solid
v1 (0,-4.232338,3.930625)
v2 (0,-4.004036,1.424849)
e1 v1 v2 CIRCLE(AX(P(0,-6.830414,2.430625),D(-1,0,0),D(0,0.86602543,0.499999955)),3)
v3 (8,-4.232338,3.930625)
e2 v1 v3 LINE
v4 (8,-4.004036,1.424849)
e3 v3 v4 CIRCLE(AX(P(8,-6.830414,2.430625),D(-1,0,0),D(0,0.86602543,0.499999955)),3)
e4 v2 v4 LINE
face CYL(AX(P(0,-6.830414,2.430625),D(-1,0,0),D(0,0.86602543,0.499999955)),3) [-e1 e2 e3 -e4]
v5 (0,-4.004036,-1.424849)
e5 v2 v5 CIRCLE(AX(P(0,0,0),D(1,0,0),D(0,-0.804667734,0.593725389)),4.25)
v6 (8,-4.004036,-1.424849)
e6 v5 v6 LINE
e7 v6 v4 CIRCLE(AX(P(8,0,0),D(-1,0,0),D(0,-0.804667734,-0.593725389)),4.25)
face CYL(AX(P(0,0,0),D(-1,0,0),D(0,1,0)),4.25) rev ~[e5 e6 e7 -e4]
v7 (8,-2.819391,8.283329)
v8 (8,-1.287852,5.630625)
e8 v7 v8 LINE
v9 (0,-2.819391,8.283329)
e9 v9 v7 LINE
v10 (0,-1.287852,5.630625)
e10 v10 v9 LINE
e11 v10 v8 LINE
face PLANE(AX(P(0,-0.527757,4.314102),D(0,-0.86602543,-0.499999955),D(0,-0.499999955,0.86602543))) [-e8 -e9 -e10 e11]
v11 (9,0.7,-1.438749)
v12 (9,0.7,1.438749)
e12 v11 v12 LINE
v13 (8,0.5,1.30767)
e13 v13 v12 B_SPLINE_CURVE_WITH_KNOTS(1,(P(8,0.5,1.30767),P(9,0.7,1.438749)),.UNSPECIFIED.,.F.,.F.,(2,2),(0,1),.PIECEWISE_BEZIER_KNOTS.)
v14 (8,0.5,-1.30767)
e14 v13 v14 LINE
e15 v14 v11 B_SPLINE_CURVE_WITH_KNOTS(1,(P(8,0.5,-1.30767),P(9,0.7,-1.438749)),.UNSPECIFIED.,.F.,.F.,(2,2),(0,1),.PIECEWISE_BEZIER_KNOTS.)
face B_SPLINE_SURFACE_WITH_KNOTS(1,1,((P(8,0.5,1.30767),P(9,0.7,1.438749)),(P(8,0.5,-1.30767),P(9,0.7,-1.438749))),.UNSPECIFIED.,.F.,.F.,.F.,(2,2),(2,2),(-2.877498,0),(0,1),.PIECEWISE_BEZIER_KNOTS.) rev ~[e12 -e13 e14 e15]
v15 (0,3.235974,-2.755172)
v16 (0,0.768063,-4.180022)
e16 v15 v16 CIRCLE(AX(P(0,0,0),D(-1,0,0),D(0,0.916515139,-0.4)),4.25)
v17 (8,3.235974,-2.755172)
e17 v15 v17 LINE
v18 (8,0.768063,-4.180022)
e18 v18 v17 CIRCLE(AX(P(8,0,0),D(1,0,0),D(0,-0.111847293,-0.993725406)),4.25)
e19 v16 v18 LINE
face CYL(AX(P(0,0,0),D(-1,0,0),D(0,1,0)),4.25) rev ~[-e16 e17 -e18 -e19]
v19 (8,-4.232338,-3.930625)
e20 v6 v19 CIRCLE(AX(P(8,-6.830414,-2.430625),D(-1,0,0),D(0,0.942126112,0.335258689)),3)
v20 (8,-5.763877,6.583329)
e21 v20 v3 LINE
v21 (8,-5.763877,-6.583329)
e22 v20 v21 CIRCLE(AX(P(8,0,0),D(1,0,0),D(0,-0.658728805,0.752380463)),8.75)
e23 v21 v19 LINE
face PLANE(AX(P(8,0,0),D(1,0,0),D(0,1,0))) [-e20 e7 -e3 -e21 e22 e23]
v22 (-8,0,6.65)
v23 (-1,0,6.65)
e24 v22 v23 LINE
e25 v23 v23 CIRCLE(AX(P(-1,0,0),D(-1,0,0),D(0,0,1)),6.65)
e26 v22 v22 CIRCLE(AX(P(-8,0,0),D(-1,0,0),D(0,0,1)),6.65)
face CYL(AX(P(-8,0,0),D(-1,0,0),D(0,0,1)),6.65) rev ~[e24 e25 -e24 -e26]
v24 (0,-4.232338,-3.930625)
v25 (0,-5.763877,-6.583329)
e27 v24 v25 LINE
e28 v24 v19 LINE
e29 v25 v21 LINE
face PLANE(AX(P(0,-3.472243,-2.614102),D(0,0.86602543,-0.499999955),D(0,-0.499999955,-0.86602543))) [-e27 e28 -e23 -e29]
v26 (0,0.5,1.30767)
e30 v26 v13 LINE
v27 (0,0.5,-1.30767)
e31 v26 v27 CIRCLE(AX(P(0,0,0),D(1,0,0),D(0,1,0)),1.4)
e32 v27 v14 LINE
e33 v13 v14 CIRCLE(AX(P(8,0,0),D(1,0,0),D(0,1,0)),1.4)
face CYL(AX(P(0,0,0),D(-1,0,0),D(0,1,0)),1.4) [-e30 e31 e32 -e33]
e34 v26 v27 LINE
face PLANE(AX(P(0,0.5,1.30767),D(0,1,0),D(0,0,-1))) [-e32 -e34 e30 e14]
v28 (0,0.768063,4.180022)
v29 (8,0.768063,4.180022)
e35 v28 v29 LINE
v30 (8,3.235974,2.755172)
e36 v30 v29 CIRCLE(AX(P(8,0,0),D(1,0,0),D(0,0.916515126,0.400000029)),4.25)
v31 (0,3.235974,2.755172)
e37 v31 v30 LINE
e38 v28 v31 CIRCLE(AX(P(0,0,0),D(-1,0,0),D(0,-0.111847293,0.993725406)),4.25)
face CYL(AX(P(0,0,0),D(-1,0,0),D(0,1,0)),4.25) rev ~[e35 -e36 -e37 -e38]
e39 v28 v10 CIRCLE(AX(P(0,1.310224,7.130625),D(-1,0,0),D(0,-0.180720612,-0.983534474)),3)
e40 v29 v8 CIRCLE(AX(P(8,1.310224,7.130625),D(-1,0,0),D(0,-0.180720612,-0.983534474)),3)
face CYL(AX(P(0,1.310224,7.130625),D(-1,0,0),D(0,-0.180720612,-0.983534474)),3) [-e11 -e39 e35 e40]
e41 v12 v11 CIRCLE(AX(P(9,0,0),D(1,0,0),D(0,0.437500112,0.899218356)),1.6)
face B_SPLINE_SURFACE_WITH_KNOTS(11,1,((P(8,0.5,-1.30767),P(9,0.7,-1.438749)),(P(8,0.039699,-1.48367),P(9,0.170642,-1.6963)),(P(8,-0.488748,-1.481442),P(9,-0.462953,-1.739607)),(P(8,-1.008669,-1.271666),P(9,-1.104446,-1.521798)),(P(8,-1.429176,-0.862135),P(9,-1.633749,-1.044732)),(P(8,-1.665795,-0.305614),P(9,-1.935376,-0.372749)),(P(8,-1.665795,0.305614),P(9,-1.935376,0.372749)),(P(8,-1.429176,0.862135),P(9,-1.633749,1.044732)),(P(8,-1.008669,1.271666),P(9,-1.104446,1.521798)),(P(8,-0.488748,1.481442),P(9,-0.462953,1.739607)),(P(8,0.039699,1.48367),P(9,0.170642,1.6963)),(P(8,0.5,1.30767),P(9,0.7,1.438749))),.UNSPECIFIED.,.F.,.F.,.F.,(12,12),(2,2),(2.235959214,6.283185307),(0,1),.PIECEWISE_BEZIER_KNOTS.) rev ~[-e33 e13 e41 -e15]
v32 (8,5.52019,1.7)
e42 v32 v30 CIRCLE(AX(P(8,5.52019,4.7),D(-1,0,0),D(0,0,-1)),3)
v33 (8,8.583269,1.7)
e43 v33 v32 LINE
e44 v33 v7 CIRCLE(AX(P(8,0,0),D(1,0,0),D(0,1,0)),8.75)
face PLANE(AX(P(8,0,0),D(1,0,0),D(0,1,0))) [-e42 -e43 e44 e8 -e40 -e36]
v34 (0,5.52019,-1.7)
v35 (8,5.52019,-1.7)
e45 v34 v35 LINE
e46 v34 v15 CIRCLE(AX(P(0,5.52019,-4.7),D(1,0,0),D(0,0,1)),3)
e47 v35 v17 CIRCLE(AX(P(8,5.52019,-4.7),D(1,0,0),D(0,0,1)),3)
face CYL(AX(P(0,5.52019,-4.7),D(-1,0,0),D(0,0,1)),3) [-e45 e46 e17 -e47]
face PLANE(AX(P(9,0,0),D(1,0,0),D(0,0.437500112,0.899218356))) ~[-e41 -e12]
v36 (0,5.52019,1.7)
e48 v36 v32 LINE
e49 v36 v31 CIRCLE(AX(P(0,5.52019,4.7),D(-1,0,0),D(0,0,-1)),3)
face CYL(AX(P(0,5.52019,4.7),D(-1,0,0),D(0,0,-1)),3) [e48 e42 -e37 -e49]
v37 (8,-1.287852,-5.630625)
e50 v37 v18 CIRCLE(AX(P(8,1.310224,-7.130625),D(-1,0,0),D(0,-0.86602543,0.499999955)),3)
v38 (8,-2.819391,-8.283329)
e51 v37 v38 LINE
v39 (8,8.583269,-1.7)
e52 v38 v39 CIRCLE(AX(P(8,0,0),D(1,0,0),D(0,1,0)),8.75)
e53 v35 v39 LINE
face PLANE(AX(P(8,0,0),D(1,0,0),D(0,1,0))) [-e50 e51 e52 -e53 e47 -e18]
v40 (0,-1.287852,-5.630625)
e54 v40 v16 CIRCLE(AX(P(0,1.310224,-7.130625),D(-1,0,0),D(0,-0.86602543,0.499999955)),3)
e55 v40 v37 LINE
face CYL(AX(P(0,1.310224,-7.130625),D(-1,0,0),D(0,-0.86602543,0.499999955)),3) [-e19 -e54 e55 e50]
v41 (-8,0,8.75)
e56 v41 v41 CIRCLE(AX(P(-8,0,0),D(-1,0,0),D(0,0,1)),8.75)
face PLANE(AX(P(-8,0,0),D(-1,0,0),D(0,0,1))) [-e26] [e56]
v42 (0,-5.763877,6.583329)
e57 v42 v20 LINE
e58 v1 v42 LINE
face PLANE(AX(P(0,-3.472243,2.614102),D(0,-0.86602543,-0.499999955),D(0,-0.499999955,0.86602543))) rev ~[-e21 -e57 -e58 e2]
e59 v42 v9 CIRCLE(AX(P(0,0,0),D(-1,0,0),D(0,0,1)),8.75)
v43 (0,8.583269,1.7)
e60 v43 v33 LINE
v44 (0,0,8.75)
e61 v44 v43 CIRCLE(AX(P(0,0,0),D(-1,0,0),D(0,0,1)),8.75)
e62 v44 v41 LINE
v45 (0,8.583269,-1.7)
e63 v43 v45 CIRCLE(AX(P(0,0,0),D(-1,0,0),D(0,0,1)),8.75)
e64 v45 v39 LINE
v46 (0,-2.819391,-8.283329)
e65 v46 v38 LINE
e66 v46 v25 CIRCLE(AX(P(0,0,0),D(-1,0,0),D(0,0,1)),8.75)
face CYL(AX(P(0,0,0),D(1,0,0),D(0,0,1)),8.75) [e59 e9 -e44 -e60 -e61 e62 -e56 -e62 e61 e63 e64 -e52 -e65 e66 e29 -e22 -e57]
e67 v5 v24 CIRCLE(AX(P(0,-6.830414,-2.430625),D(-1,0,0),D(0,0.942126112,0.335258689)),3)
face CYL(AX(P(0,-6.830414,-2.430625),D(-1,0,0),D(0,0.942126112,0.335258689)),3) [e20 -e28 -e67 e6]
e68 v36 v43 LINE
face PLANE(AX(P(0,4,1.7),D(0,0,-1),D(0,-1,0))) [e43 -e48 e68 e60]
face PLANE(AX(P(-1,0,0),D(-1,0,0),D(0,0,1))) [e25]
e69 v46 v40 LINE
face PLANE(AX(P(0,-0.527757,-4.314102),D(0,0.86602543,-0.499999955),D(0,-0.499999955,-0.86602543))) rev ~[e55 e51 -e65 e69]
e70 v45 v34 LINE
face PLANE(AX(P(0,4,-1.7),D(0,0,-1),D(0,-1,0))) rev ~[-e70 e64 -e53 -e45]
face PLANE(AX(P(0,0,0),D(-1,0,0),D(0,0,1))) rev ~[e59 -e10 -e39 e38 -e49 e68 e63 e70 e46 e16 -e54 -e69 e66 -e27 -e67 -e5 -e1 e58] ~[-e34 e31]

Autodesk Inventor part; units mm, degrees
ref_plane "YZ Plane" through (0, 0, 0) normal (1, 0, 0) x (0, 1, 0)
ref_plane "XZ Plane" through (0, 0, 0) normal (0, 1, 0) x (-1, 0, 0)
sketch "Sketch1" plane through (0, 0, 0) normal (1, 0, 0) x (0, 1, 0)
  circle A0 centre (0, 0) radius 1.4
  line L0 (0.5, 1.30767) -> (0.5, -1.30767)
  dimension "d1" = 2.8
  dimension "d2" = 0.5
extrude "Extrusion1" add sketch "Sketch1" along normal blind 8 contours L0 A0 picked at (-0.62029, 0.295862)
sketch "Sketch2" plane through (0, 0, 0) normal (-1, 0, 0) x (0, 0, 1)
  circle A0 centre (0, 0) radius 8.75
  arc A1 (-1.30767, 0.5) -> (1.30767, 0.5) centre (0, 0) ccw
  dimension "d5" = 17.5
extrude "Extrusion2" add sketch "Sketch2" along normal blind 8
sketch "Sketch3" plane through (0, 0, 0) normal (1, 0, 0) x (0, 1, 0)
  circle A0 centre (0, 0) radius 4.25
  line L0 (4, 1.7) -> (8.583269, 1.7)
  line L1 (4, -1.7) -> (8.583269, -1.7)
  line L2 (-10.5, 0) -> (10.5, 0)
  circle A1 centre (0, 0) radius 8.75
  line L3 (0.5, -1.30767) -> (0.5, 1.30767)
  arc A2 (0.5, 1.30767) -> (0.5, -1.30767) centre (0, 0) ccw
  arc A3 (3.852905, 1.793773) -> (4, 1.7) centre (4, 1.862255) ccw
  arc A4 (4, -1.7) -> (3.852905, -1.793773) centre (4, -1.862255) ccw
  line L4 (-3.472243, 2.614102) -> (-5.763877, 6.583329)
  line L5 (-0.527757, 4.314102) -> (-2.819391, 8.283329)
  arc A5 (-0.527757, 4.314102) -> (-0.373, 4.2336) centre (-0.38724, 4.395229) ccw
  arc A6 (-3.479906, 2.439827) -> (-3.472243, 2.614102) centre (-3.61276, 2.532974) ccw
  line L6 (-0.527757, -4.314102) -> (-2.819391, -8.283329)
  line L7 (-3.472243, -2.614102) -> (-5.763877, -6.583329)
  arc A7 (-3.472243, -2.614102) -> (-3.479906, -2.439827) centre (-3.61276, -2.532974) ccw
  arc A8 (-0.373, -4.2336) -> (-0.527757, -4.314102) centre (-0.38724, -4.395229) ccw
  arc A9 (0.5, 1.30767) -> (0.5, -1.30767) centre (0, 0) ccw
  circle A10 centre (0, 0) radius 5
  line L8 (4, 1.7) -> (3.895189, 1.7)
  line L9 (4, -1.7) -> (3.840573, -1.7)
  line L10 (-0.527757, -4.314102) -> (-0.475351, -4.223333)
  line L11 (-3.472243, -2.614102) -> (-3.419838, -2.523333)
  line L12 (-3.472243, 2.614102) -> (-3.419838, 2.523333)
  line L13 (-0.527757, 4.314102) -> (-0.475351, 4.223333)
  point P0 (-3.479906, -2.439827)
  point P1 (-4.25, 0)
  point P2 (-8.75, 0)
  point P3 (-0.373, -4.2336)
  point P4 (-2.819391, -8.283329)
  point P5 (-0.373, 4.2336)
  point P6 (-2.819391, 8.283329)
  point P7 (-3.479906, 2.439827)
  point P8 (3.895189, -1.7)
  dimension "d8" = 8.5
  dimension "d9" = 3.4
  dimension "d10" = 4
  dimension "d14" = 360
  dimension "d22" = 10
extrude "Extrusion3" add sketch "Sketch3" along normal blind 8 contours A0 A3 L8 | L9 A4 A0 | A0 A5 L5 A10 L0 A3 | A4 L1 A10 L6 A8 A0 | A10 L5 A1 L0 | L1 A1 L6 A10 | A0 L13 A5 | A8 L10 A0 | L2 A10 L4 A6 A0 | A0 A7 L7 A10 L2 | A10 L2 A1 L4 | L7 A1 L2 A10 | A6 L12 A0 | A0 L11 A7
sketch "Sketch4" plane through (-8, 0, 0) normal (-1, 0, 0) x (0, 0, 1)
  circle A0 centre (0, 0) radius 6.65
  dimension "d19" = 13.3
extrude "Extrusion4" cut sketch "Sketch4" against normal blind 7
fillet "Fillet1" radius 3 6 edges at (4, 3.8952, 1.7) (4, -0.4754, 4.2233) (4, 3.8952, -1.7) (4, -0.4754, -4.2233) (4, -3.4198, -2.5233) (4, -3.4198, 2.5233)
sketch "Sketch5" plane through (-1, 0, 0) normal (-1, 0, 0) x (0, 0, 1)
  circle A0 centre (0, 0) radius 2.5
  dimension "d24" = 5
extrude "Extrusion5" [suppressed]
sketch "Sketch6" plane through (-22, 0, 0) normal (-1, 0, 0) x (0, 0, 1)
  arc A0 (-1.2, 0.5) -> (1.2, 0.5) centre (0, 0) ccw projected
  circle A1 centre (0, 0) radius 2.5 projected
ref_plane "Work Plane1" through (9, 0, 0) normal (1, 0, 0) x (0, 0, -1)
sketch "Sketch7" plane through (9, 0, 0) normal (1, 0, 0) x (0, 0, -1)
  arc A0 (-1.30767, 0.5) -> (1.30767, 0.5) centre (0, 0) ccw
  line L0 (1.30767, 0.5) -> (-1.30767, 0.5)
  circle A1 centre (0, 0) radius 1.6
  line L1 (-1.438749, 0.7) -> (1.438749, 0.7)
  dimension "d28" = 3.2
  dimension "d30" = 0.5
  dimension "d31" = 0.7
sketch "Sketch8" plane through (8, 0, 0) normal (1, 0, 0) x (0, 0, -1)
  arc A0 (-1.30767, 0.5) -> (1.30767, 0.5) centre (0, 0) ccw
  line L0 (1.30767, 0.5) -> (-1.30767, 0.5)
sketch "Sketch7 outline for Loft1" plane through (9, 0, 0) normal (1, 0, 0) x (0, 0, -1)
  line L0 (1.438749, 0.7) -> (-1.438749, 0.7)
  arc A0 (-1.438749, 0.7) -> (1.438749, 0.7) centre (0, 0) ccw
loft "Loft1" add profiles "Sketch7 outline for Loft1" section 1 edges at (8, -1.4, 0) (8, 0.5, 0)
properties part number "front wheel mount"
